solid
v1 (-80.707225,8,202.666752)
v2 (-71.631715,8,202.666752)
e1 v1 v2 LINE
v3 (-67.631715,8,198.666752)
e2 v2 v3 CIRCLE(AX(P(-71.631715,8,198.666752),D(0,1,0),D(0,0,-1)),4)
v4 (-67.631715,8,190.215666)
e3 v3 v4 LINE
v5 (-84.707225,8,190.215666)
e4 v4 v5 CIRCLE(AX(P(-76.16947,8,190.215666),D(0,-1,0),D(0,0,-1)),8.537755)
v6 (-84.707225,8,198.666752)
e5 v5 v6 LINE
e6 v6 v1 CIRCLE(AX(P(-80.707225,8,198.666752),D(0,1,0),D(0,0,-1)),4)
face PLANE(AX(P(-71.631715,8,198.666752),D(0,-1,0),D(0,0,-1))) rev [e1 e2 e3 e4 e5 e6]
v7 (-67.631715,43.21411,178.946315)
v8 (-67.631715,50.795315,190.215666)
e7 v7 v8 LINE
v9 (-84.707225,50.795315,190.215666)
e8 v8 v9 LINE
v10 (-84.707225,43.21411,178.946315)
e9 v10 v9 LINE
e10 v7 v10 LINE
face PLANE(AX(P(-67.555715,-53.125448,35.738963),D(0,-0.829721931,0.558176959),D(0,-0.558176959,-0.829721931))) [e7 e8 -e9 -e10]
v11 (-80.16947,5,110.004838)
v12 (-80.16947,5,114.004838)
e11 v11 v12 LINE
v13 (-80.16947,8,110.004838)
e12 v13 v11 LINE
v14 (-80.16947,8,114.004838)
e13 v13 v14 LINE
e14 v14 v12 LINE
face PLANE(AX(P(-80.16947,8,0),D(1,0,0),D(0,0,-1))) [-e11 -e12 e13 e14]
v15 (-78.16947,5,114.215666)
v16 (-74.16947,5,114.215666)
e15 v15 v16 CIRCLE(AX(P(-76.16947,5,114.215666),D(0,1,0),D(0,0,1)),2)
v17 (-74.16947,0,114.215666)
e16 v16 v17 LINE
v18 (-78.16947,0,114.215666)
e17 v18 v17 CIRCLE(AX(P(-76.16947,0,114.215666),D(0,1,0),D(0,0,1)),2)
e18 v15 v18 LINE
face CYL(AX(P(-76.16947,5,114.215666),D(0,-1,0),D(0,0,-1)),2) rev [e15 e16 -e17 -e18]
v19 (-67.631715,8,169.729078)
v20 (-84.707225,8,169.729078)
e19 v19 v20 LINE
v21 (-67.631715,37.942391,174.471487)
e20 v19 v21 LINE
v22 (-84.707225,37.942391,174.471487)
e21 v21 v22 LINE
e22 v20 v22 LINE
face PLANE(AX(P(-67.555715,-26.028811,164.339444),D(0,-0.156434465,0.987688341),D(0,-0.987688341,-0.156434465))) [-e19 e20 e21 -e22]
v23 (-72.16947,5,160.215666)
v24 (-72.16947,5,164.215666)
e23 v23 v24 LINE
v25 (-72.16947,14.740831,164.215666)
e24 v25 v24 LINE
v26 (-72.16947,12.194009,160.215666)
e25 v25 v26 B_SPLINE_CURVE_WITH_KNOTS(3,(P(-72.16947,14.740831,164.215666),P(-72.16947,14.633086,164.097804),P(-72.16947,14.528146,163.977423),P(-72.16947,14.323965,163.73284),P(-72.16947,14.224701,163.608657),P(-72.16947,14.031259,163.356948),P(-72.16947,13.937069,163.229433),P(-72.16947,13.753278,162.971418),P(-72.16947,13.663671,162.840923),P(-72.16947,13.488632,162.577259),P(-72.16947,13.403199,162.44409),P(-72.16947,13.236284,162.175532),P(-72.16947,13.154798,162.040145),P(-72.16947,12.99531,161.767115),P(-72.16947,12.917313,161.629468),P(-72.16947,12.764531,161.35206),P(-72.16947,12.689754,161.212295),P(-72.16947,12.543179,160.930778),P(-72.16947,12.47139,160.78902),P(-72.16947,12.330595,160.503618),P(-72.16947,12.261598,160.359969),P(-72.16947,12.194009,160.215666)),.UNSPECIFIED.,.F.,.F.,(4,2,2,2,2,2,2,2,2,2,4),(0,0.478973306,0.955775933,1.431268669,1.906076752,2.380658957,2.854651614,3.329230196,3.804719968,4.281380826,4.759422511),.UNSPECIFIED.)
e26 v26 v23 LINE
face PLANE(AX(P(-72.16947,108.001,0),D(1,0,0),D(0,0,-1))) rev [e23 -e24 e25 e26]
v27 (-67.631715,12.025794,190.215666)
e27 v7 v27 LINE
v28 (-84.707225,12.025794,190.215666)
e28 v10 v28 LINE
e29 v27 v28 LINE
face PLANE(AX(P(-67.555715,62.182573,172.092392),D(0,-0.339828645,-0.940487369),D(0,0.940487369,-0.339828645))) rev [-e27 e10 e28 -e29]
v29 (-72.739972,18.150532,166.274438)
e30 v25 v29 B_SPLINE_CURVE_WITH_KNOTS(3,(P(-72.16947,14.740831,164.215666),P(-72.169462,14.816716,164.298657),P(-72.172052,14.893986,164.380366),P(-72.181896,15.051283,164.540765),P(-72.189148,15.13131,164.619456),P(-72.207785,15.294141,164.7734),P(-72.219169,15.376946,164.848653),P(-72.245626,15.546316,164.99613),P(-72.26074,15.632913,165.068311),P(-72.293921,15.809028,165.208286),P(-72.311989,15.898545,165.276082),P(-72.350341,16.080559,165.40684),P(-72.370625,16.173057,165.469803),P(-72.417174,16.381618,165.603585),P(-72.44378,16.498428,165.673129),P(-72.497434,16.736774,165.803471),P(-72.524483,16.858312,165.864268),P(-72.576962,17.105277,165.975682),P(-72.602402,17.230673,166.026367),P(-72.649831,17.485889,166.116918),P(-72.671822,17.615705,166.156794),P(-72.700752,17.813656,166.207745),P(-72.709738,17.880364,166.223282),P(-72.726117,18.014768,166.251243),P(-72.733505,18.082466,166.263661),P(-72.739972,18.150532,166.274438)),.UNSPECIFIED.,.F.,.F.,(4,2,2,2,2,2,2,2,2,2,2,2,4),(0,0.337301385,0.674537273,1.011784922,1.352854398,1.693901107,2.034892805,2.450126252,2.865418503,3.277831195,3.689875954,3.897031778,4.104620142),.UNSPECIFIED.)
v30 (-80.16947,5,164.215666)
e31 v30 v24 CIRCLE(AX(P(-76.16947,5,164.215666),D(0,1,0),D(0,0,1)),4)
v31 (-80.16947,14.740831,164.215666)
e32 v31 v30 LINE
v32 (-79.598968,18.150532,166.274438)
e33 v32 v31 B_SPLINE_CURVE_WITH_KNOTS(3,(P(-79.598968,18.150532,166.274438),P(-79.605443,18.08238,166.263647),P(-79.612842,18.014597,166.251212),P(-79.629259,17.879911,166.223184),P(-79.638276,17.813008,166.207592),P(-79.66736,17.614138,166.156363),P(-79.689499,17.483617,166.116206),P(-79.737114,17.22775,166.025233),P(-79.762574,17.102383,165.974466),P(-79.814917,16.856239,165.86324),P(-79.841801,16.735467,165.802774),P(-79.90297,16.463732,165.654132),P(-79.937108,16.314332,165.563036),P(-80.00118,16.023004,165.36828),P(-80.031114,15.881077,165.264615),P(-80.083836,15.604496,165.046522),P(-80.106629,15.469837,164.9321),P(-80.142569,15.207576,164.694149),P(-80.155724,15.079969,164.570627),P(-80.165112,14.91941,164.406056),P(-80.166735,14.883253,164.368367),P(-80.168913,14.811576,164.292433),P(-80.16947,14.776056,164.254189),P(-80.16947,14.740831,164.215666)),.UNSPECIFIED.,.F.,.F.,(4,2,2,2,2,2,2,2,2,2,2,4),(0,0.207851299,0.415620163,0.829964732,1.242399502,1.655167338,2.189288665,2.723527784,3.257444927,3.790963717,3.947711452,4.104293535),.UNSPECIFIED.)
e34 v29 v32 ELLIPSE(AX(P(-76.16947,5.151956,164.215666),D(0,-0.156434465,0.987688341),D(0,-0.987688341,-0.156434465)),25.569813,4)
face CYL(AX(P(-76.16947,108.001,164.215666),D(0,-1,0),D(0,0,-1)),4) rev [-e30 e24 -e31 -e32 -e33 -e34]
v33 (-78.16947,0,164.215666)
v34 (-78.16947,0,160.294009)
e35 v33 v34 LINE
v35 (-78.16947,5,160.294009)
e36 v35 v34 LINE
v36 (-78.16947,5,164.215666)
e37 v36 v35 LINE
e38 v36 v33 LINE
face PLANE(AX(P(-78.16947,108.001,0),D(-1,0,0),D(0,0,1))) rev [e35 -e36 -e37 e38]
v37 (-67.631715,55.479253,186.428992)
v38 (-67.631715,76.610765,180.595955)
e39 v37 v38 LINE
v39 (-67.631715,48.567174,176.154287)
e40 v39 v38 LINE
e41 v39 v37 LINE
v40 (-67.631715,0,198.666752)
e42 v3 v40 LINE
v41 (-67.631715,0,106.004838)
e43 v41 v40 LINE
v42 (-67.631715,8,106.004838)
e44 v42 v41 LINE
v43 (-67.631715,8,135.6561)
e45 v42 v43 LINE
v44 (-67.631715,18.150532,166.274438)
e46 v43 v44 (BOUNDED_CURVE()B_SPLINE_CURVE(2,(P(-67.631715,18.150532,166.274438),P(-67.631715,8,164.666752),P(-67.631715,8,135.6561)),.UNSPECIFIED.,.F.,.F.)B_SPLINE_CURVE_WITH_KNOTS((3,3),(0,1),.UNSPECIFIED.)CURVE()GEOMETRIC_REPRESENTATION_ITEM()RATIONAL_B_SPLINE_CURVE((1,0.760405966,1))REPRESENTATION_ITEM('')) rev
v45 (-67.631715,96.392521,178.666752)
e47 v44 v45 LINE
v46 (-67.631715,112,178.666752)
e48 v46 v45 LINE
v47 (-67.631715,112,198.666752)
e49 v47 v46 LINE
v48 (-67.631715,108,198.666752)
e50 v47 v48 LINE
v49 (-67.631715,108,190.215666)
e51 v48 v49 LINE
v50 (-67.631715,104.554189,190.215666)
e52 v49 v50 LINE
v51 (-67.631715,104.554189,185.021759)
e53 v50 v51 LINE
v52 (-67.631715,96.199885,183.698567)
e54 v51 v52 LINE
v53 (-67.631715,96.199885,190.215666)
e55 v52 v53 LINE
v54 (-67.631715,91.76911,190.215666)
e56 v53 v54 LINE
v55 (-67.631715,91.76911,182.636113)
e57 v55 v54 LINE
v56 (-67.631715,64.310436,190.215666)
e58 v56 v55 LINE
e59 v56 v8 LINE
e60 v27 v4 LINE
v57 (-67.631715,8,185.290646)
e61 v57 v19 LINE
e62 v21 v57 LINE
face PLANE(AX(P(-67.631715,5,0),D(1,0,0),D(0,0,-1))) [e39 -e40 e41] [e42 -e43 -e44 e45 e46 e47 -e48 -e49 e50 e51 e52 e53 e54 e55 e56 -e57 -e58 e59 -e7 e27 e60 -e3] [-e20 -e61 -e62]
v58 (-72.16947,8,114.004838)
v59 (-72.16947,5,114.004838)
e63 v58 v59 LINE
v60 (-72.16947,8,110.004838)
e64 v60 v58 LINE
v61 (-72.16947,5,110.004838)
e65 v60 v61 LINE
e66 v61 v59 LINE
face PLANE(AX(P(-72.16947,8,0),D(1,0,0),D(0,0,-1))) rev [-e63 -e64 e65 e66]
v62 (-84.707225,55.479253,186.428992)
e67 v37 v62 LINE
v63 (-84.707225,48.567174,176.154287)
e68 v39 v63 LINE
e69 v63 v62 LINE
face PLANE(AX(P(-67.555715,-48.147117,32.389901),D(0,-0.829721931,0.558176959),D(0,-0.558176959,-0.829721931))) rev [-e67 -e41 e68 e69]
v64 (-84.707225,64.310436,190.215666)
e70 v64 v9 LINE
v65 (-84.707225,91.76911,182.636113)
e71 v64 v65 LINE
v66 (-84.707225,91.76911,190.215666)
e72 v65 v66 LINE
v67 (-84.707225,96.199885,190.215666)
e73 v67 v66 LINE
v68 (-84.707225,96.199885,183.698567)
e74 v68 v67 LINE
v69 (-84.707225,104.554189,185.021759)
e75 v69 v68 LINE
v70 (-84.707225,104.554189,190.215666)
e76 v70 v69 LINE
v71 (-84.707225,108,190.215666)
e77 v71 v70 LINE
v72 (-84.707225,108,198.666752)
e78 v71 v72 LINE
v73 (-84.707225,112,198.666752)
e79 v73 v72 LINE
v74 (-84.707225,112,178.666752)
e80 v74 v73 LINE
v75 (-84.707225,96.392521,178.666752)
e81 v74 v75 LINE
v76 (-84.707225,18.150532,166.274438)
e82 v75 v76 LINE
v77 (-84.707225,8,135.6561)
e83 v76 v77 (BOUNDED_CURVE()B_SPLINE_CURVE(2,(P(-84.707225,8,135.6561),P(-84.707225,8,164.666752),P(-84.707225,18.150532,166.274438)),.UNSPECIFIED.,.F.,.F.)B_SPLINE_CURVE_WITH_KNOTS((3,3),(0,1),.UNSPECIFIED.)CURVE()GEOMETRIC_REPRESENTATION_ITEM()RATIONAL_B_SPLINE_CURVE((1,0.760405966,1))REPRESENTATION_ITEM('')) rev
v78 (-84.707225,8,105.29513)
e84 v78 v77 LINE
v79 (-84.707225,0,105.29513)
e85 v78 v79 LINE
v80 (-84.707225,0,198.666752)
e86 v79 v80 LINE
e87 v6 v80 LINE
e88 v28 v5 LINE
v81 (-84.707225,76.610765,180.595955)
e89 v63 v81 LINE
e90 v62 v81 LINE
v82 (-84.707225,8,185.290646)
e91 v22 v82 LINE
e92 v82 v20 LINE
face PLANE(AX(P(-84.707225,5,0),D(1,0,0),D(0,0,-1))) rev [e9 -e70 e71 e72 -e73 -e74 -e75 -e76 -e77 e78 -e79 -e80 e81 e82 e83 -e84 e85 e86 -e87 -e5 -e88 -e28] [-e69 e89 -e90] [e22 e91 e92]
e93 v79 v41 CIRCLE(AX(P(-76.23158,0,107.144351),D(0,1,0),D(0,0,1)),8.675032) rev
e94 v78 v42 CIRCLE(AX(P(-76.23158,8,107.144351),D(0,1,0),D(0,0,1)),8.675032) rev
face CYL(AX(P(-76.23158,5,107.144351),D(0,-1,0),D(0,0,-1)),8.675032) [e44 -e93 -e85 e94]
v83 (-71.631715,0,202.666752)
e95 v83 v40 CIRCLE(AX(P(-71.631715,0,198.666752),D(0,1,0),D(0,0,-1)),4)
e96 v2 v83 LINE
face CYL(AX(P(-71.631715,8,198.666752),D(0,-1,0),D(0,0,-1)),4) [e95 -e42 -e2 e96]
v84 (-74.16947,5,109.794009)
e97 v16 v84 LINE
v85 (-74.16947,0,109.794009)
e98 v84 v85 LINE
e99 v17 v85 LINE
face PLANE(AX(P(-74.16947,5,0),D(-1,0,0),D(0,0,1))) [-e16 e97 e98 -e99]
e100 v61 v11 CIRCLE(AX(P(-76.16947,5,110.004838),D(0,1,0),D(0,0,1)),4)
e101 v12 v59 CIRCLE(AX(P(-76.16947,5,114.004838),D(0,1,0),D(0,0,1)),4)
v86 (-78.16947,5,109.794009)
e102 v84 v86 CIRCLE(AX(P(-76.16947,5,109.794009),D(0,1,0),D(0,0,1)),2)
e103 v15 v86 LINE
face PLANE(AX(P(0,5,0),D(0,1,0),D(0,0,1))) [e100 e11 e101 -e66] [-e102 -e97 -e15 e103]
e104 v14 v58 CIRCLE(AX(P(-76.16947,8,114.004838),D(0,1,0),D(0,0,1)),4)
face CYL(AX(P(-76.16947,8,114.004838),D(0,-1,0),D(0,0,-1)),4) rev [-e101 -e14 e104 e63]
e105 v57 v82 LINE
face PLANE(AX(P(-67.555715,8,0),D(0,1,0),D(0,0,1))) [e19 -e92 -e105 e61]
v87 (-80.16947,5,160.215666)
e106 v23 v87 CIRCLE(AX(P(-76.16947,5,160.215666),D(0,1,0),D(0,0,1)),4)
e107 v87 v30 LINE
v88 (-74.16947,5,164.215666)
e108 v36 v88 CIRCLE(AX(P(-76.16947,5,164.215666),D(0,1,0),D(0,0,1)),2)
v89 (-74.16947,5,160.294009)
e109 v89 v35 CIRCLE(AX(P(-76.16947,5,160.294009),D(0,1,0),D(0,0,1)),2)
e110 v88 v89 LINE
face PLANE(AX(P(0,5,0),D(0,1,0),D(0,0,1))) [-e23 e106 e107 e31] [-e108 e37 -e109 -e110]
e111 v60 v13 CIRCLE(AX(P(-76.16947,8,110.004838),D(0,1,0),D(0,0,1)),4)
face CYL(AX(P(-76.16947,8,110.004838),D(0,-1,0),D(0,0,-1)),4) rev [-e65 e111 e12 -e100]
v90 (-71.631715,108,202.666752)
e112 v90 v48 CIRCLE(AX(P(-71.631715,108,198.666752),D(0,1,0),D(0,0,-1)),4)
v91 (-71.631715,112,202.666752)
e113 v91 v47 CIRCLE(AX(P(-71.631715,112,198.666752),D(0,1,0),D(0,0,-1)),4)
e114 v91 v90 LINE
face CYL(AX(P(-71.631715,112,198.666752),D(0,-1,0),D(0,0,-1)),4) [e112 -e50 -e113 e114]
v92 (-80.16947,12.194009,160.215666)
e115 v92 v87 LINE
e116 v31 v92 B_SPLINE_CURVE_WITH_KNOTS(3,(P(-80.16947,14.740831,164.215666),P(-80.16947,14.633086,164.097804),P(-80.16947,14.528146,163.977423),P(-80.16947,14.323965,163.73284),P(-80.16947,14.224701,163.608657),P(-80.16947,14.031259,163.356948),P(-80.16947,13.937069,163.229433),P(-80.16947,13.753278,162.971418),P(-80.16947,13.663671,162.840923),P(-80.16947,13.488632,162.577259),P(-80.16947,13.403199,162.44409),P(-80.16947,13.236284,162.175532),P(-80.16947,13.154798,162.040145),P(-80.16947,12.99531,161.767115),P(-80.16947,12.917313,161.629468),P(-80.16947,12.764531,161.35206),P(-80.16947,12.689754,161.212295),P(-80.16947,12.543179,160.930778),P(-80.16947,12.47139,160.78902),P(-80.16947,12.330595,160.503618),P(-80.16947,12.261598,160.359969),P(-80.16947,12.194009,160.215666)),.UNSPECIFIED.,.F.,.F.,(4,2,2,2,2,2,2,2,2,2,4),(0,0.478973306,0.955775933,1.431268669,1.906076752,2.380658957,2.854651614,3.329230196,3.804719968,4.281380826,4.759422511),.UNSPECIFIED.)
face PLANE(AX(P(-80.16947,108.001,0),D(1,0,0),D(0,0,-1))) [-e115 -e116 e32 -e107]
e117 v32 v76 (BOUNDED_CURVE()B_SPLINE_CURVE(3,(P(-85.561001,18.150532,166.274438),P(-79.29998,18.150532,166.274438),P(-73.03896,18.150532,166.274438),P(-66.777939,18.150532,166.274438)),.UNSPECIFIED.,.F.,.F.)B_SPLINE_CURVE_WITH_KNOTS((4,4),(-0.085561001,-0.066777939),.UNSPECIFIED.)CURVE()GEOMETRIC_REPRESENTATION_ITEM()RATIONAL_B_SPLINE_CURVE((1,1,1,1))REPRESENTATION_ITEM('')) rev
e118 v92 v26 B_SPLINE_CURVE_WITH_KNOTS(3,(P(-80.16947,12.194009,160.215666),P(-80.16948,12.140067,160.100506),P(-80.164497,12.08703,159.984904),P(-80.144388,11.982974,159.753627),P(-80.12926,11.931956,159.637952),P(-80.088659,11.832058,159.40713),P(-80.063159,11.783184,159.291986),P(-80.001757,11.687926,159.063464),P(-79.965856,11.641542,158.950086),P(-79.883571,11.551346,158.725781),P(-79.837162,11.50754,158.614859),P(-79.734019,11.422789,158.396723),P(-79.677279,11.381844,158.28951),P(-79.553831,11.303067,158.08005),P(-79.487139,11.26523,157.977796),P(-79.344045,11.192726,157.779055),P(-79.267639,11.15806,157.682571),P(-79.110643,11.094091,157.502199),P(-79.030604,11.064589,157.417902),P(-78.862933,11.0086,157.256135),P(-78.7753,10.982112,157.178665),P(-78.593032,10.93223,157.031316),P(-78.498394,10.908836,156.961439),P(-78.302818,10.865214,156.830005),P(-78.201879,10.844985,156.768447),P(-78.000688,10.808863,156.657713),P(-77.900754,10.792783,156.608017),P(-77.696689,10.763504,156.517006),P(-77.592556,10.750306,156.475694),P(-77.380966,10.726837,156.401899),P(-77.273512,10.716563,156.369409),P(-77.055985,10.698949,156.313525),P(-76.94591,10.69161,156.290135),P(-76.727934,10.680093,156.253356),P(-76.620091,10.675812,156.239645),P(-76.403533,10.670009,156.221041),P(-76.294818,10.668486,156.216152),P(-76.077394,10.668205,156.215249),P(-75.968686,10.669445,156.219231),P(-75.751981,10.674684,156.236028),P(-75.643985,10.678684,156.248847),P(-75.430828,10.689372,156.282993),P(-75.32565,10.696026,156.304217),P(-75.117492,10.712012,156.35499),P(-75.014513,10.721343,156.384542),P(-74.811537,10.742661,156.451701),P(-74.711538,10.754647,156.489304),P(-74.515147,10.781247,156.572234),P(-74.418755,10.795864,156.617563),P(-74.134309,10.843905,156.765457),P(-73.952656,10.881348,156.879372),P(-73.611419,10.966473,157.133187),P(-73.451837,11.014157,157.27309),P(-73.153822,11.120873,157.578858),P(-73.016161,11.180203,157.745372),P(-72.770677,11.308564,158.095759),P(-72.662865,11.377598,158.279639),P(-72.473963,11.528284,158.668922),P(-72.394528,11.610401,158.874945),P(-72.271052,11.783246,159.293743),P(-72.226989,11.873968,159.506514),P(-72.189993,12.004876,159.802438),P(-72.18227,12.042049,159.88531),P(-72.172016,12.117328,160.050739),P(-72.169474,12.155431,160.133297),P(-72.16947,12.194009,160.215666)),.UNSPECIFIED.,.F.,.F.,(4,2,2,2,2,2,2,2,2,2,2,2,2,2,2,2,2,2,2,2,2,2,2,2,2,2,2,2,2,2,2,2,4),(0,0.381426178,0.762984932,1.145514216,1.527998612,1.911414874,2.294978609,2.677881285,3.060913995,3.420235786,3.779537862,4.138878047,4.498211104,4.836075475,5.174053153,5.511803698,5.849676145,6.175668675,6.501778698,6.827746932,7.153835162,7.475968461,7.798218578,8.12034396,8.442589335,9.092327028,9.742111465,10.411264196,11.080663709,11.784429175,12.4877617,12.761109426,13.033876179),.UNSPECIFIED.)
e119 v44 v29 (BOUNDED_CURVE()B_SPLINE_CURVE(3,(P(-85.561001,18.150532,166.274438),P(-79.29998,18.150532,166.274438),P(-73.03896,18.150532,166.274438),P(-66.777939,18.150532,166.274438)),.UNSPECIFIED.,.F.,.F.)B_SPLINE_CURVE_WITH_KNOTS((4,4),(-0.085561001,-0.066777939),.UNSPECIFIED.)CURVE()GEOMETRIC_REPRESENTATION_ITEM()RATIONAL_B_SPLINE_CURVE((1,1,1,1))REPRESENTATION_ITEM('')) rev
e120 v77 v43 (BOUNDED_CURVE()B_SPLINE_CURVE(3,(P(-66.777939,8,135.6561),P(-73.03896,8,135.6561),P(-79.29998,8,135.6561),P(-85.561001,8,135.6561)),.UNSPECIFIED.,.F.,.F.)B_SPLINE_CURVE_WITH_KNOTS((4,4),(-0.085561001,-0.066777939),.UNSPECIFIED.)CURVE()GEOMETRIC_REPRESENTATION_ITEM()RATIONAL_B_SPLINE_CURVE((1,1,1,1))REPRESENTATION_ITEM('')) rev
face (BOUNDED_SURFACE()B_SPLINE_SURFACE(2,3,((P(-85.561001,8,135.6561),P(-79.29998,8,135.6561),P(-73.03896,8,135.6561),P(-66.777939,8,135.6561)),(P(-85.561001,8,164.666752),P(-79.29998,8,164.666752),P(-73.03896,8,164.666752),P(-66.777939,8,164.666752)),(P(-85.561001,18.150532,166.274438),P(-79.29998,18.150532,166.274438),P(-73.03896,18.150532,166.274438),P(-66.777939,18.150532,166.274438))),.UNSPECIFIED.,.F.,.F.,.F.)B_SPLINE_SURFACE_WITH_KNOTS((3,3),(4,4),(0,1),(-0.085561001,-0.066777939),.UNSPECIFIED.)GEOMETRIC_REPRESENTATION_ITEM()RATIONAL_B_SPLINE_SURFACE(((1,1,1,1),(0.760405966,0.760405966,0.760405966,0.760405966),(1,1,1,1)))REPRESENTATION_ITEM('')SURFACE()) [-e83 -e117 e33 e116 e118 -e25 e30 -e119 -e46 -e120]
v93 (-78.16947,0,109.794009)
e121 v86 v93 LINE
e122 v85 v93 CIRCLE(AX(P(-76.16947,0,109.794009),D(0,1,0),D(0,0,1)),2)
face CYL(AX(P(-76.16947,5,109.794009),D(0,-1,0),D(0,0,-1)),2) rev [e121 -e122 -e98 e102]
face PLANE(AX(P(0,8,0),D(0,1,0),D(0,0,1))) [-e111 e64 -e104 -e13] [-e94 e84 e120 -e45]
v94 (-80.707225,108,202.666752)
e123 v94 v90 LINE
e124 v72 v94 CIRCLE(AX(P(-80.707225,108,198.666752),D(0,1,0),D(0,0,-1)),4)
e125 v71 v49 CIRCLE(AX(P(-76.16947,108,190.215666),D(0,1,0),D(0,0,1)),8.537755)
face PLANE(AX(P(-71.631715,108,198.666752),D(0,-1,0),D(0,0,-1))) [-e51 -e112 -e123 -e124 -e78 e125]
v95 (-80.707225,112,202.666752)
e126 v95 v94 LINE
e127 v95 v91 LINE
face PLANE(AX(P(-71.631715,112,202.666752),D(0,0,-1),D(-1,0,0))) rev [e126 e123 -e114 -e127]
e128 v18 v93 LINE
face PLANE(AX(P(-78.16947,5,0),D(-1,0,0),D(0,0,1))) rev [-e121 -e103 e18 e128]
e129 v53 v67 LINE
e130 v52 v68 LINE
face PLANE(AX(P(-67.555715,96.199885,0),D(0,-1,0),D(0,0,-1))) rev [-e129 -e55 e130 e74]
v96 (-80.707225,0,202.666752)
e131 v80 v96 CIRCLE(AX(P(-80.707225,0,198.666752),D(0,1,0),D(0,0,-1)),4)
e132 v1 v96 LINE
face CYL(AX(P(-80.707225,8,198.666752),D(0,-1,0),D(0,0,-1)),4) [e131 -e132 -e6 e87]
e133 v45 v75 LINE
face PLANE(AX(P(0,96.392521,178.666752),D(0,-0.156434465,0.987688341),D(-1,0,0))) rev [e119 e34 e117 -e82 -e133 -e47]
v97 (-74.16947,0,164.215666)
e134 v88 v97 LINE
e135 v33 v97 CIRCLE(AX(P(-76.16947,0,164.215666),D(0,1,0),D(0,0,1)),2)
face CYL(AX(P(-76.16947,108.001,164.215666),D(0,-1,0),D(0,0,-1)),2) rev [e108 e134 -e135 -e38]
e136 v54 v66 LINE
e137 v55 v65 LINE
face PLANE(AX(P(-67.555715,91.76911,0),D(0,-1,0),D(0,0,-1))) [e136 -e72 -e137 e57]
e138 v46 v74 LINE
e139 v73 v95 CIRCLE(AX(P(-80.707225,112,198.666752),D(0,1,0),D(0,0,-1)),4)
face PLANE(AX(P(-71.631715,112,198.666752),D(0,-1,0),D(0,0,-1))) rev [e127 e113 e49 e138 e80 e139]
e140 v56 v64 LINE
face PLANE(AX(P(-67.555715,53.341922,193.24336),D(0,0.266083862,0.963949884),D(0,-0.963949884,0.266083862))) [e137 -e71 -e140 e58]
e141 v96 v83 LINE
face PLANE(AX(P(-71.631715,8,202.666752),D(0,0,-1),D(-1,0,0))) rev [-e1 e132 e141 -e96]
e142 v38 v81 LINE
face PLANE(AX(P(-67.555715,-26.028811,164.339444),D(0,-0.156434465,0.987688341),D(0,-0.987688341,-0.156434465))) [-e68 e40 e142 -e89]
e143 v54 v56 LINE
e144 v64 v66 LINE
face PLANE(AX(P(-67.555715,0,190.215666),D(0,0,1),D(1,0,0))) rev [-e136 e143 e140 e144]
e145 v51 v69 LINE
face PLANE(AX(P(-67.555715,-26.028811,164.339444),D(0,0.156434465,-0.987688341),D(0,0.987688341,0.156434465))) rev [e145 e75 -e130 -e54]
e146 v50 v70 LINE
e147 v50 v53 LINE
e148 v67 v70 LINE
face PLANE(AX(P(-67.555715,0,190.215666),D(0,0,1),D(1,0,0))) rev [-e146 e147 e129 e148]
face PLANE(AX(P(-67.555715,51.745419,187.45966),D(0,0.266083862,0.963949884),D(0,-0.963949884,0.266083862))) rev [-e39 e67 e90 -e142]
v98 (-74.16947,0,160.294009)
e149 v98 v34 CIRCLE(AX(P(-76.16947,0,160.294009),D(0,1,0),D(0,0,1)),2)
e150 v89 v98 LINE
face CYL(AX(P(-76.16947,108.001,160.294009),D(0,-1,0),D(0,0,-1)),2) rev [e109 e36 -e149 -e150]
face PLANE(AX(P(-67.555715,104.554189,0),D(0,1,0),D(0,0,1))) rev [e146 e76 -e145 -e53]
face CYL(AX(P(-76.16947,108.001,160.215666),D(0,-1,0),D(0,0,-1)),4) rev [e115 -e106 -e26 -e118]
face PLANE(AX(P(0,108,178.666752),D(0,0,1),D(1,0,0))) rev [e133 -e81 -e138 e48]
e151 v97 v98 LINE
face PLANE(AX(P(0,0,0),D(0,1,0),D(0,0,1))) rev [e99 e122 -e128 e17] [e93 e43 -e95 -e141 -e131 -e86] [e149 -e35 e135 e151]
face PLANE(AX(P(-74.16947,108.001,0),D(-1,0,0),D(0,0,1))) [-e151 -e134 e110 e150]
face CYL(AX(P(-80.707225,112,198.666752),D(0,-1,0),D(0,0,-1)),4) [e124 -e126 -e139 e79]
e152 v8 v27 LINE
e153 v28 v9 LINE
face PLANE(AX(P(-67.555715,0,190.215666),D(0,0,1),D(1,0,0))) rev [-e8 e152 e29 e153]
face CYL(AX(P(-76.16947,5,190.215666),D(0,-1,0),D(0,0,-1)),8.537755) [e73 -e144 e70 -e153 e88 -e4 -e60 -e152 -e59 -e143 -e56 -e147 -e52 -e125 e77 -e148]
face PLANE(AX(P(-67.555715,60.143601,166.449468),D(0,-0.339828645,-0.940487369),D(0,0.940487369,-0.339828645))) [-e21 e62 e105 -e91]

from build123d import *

# Parameters (mm, degrees)
BOSS_EXTRUDE1_DEPTH = 5
BOSS_EXTRUDE2_START = 5
BOSS_EXTRUDE2_DEPTH = 3
BOSS_EXTRUDE3_START = 8
BOSS_EXTRUDE3_DEPTH = 100
CHAMFER1_SIZE       = 14
CHAMFER1_SIZE2      = 88.392521205
CUT_EXTRUDE1_REACH  = 228.845
CUT_EXTRUDE2_REACH  = 243.541
CUT_EXTRUDE3_START  = 5
CUT_EXTRUDE3_DEPTH  = 25.406962
BOSS_EXTRUDE4_DEPTH = 4
BOSS_EXTRUDE5_START = -108
BOSS_EXTRUDE5_DEPTH = 8


with BuildPart() as part:
    # Sketch1 → Boss-Extrude1 (new body)
    # profile 1 of 5: a face of its own
    with BuildSketch(Plane(origin=(0, 0, 0), x_dir=(1, 0, 0), z_dir=(0, 1, 0))):
        with BuildLine():
            Line((-67.63171498, -190.215666308), (-67.63171498, -178.666752182))
            Line((-67.63171498, -178.666752182), (-84.707225068, -178.666752182))
            Line((-84.707225068, -178.666752182), (-84.707225068, -190.215666308))
            ThreePointArc((-84.707225068, -190.215666308), (-76.169470024, -198.753421352), (-67.63171498, -190.215666308))
        make_face()
    # profile 2 of 5: a face of its own
    with BuildSketch(Plane(origin=(0, 0, 0), x_dir=(1, 0, 0), z_dir=(0, 1, 0))):
        with BuildLine():
            Line((-84.707225068, -178.666752182), (-67.63171498, -178.666752182))
            Line((-67.63171498, -178.666752182), (-67.63171498, -106.004837653))
            ThreePointArc((-67.63171498, -106.004837653), (-75.871331662, -98.476802493), (-84.707225068, -105.29512957))
            Line((-84.707225068, -105.29512957), (-84.707225068, -178.666752182))
        make_face()
        with BuildLine():
            ThreePointArc((-80.169470024, -160.215666308), (-76.169470024, -156.215666308), (-72.169470024, -160.215666308))
            Line((-72.169470024, -160.215666308), (-72.169470024, -164.215666308))
            ThreePointArc((-72.169470024, -164.215666308), (-76.169470024, -168.215666308), (-80.169470024, -164.215666308))
            Line((-80.169470024, -164.215666308), (-80.169470024, -160.215666308))
        make_face(mode=Mode.SUBTRACT)
        with BuildLine():
            ThreePointArc((-80.169470024, -110.004837653), (-76.169470024, -106.004837653), (-72.169470024, -110.004837653))
            Line((-72.169470024, -110.004837653), (-72.169470024, -114.004837653))
            ThreePointArc((-72.169470024, -114.004837653), (-76.169470024, -118.004837653), (-80.169470024, -114.004837653))
            Line((-80.169470024, -114.004837653), (-80.169470024, -110.004837653))
        make_face(mode=Mode.SUBTRACT)
    # profile 3 of 5: a face of its own
    with BuildSketch(Plane(origin=(0, 0, 0), x_dir=(1, 0, 0), z_dir=(0, 1, 0))):
        with BuildLine():
            Line((-80.169470024, -160.215666308), (-80.169470024, -164.215666308))
            ThreePointArc((-80.169470024, -164.215666308), (-76.169470024, -168.215666308), (-72.169470024, -164.215666308))
            Line((-72.169470024, -164.215666308), (-72.169470024, -160.215666308))
            ThreePointArc((-72.169470024, -160.215666308), (-76.169470024, -156.215666308), (-80.169470024, -160.215666308))
        make_face()
        with BuildLine():
            ThreePointArc((-74.169470024, -160.294008998), (-76.169470024, -158.294008998), (-78.169470024, -160.294008998))
            Line((-78.169470024, -160.294008998), (-78.169470024, -164.215666308))
            ThreePointArc((-78.169470024, -164.215666308), (-76.169470024, -166.215666308), (-74.169470024, -164.215666308))
            Line((-74.169470024, -164.215666308), (-74.169470024, -160.294008998))
        make_face(mode=Mode.SUBTRACT)
    # profile 4 of 5: a face of its own
    with BuildSketch(Plane(origin=(0, 0, 0), x_dir=(1, 0, 0), z_dir=(0, 1, 0))):
        with BuildLine():
            Line((-80.169470024, -110.004837653), (-80.169470024, -114.004837653))
            ThreePointArc((-80.169470024, -114.004837653), (-76.169470024, -118.004837653), (-72.169470024, -114.004837653))
            Line((-72.169470024, -114.004837653), (-72.169470024, -110.004837653))
            ThreePointArc((-72.169470024, -110.004837653), (-76.169470024, -106.004837653), (-80.169470024, -110.004837653))
        make_face()
        with BuildLine():
            ThreePointArc((-74.169470024, -109.794008998), (-76.169470024, -107.794008998), (-78.169470024, -109.794008998))
            Line((-78.169470024, -109.794008998), (-78.169470024, -114.215666308))
            ThreePointArc((-78.169470024, -114.215666308), (-76.169470024, -116.215666308), (-74.169470024, -114.215666308))
            Line((-74.169470024, -114.215666308), (-74.169470024, -109.794008998))
        make_face(mode=Mode.SUBTRACT)
    # profile 5 of 5: a face of its own
    with BuildSketch(Plane(origin=(0, 0, 0), x_dir=(1, 0, 0), z_dir=(0, 1, 0))):
        with BuildLine():
            Line((-74.169470024, -164.215666308), (-74.169470024, -160.294008998))
            ThreePointArc((-74.169470024, -160.294008998), (-76.169470024, -158.294008998), (-78.169470024, -160.294008998))
            Line((-78.169470024, -160.294008998), (-78.169470024, -164.215666308))
            ThreePointArc((-78.169470024, -164.215666308), (-76.169470024, -166.215666308), (-74.169470024, -164.215666308))
        make_face()
    extrude(amount=BOSS_EXTRUDE1_DEPTH)

    # Sketch1<3> → Boss-Extrude2 (add)
    with BuildSketch(Plane(origin=(0, 0, 0), x_dir=(1, 0, 0), z_dir=(0, 1, 0)).offset(BOSS_EXTRUDE2_START)):
        with BuildLine():
            Line((-67.63171498, -190.215666308), (-67.63171498, -106.004837653))
            ThreePointArc((-67.63171498, -106.004837653), (-75.871331662, -98.476802493), (-84.707225068, -105.29512957))
            Line((-84.707225068, -105.29512957), (-84.707225068, -190.215666308))
            ThreePointArc((-84.707225068, -190.215666308), (-76.169470024, -198.753421352), (-67.63171498, -190.215666308))
        make_face()
        with BuildLine():
            Line((-72.169470024, -110.004837653), (-72.169470024, -114.004837653))
            ThreePointArc((-72.169470024, -114.004837653), (-76.169470024, -118.004837653), (-80.169470024, -114.004837653))
            Line((-80.169470024, -114.004837653), (-80.169470024, -110.004837653))
            ThreePointArc((-80.169470024, -110.004837653), (-76.169470024, -106.004837653), (-72.169470024, -110.004837653))
        make_face(mode=Mode.SUBTRACT)
    extrude(amount=BOSS_EXTRUDE2_DEPTH)

    # Sketch1<4> → Boss-Extrude3 (add)
    with BuildSketch(Plane(origin=(0, 0, 0), x_dir=(1, 0, 0), z_dir=(0, 1, 0)).offset(BOSS_EXTRUDE3_START)):
        with BuildLine():
            Line((-67.63171498, -190.215666308), (-67.63171498, -178.666752182))
            Line((-67.63171498, -178.666752182), (-84.707225068, -178.666752182))
            Line((-84.707225068, -178.666752182), (-84.707225068, -190.215666308))
            ThreePointArc((-84.707225068, -190.215666308), (-76.169470024, -198.753421352), (-67.63171498, -190.215666308))
        make_face()
    extrude(amount=BOSS_EXTRUDE3_DEPTH)

    # Chamfer1
    chamfer1_edges = [part.edges().sort_by_distance(p)[0] for p in [
        (-76.169470024, 8, 178.666752182),
    ]]
    chamfer1_side = [part.faces().sort_by_distance(p)[0] for p in [
        (-76.174011802, 8, 141.227226291),
    ]]
    chamfer(chamfer1_edges, length=CHAMFER1_SIZE, length2=CHAMFER1_SIZE2, reference=chamfer1_side[0])

    # Fillet1
    # an asymmetric fillet: 31, 15 mm, written as the material it adds along each edge
    with BuildSketch(Plane(origin=(-67.63171498, 8, 164.666752182), x_dir=(0, 0.9876883405951381, 0.15643446504022812), z_dir=(-1, 0, 0))) as fillet1_piece_1:
        with BuildLine():
            Bezier((10.277059237, 0), (0, 0), (-4.538265872, 28.653483024), weights=[1, 0.760405966, 1])
            Line((-4.538265872, 28.653483024), (0, 0))
            Line((0, 0), (10.277059237, 0))
        make_face()
    extrude(amount=17.075510088)

    # Sketch2 → Cut-Extrude1 (cut, up to next)
    with BuildSketch(Plane.ZY.offset(84.707225068), mode=Mode.PRIVATE) as cut_extrude1_sk1:
        Polygon((190.215666308, 91.769109668), (182.636112577, 91.769109668), (190.215666308, 64.31043598), align=None)
    cut_extrude1_tool1 = extrude(cut_extrude1_sk1.sketch, amount=-CUT_EXTRUDE1_REACH, mode=Mode.PRIVATE) & part.part
    # Sketch2 → Cut-Extrude1 (cut, up to next)
    with BuildSketch(Plane.ZY.offset(84.707225068), mode=Mode.PRIVATE) as cut_extrude1_sk2:
        Polygon((176.154286922, 48.567173756), (180.595955478, 76.61076533), (186.42899162, 55.479252617), align=None)
    cut_extrude1_tool2 = extrude(cut_extrude1_sk2.sketch, amount=-CUT_EXTRUDE1_REACH, mode=Mode.PRIVATE) & part.part
    # Sketch2 → Cut-Extrude1 (cut, up to next)
    with BuildSketch(Plane.ZY.offset(84.707225068), mode=Mode.PRIVATE) as cut_extrude1_sk3:
        Polygon((190.215666308, 12.025794409), (190.215666308, 50.795315392), (178.946314561, 43.21410987), align=None)
    cut_extrude1_tool3 = extrude(cut_extrude1_sk3.sketch, amount=-CUT_EXTRUDE1_REACH, mode=Mode.PRIVATE) & part.part
    # Sketch2 → Cut-Extrude1 (cut, up to next)
    with BuildSketch(Plane.ZY.offset(84.707225068), mode=Mode.PRIVATE) as cut_extrude1_sk4:
        Polygon((174.47148672, 37.942391428), (185.290645631, 8), (169.729077811, 8), align=None)
    cut_extrude1_tool4 = extrude(cut_extrude1_sk4.sketch, amount=-CUT_EXTRUDE1_REACH, mode=Mode.PRIVATE) & part.part
    # Sketch2 → Cut-Extrude1 (cut, up to next)
    with BuildSketch(Plane.ZY.offset(84.707225068), mode=Mode.PRIVATE) as cut_extrude1_sk5:
        Polygon((185.02175896, 104.554188767), (183.698567215, 96.199884882), (190.215666308, 96.199884882), (190.215666308, 104.554188767), align=None)
    cut_extrude1_tool5 = extrude(cut_extrude1_sk5.sketch, amount=-CUT_EXTRUDE1_REACH, mode=Mode.PRIVATE) & part.part
    add(cut_extrude1_tool1.solids().sort_by_distance((-84.707225, 82.616218, 187.689148))[0], mode=Mode.SUBTRACT)
    add(cut_extrude1_tool2.solids().sort_by_distance((-84.707225, 60.219064, 181.059745))[0], mode=Mode.SUBTRACT)
    add(cut_extrude1_tool3.solids().sort_by_distance((-84.707225, 35.345073, 186.459216))[0], mode=Mode.SUBTRACT)
    add(cut_extrude1_tool4.solids().sort_by_distance((-84.707225, 17.980797, 176.49707))[0], mode=Mode.SUBTRACT)
    add(cut_extrude1_tool5.solids().sort_by_distance((-84.707225, 100.219716, 187.275456))[0], mode=Mode.SUBTRACT)

    # Sketch1<5> → Cut-Extrude2 (cut, up to next)
    with BuildSketch(Plane(origin=(0, 0, 0), x_dir=(1, 0, 0), z_dir=(0, 1, 0)), mode=Mode.PRIVATE) as cut_extrude2_sk1:
        with BuildLine():
            Line((-74.169470024, -164.215666308), (-74.169470024, -160.294008998))
            ThreePointArc((-74.169470024, -160.294008998), (-76.169470024, -158.294008998), (-78.169470024, -160.294008998))
            Line((-78.169470024, -160.294008998), (-78.169470024, -164.215666308))
            ThreePointArc((-78.169470024, -164.215666308), (-76.169470024, -166.215666308), (-74.169470024, -164.215666308))
        make_face()
    cut_extrude2_tool1 = extrude(cut_extrude2_sk1.sketch, amount=CUT_EXTRUDE2_REACH, mode=Mode.PRIVATE) & part.part
    add(cut_extrude2_tool1.solids().sort_by_distance((-76.16947, 0, 162.254838))[0], mode=Mode.SUBTRACT)

    # Sketch1<6> → Cut-Extrude3 (cut)
    with BuildSketch(Plane(origin=(0, 0, 0), x_dir=(1, 0, 0), z_dir=(0, 1, 0)).offset(CUT_EXTRUDE3_START)):
        with BuildLine():
            Line((-80.169470024, -160.215666308), (-80.169470024, -164.215666308))
            ThreePointArc((-80.169470024, -164.215666308), (-76.169470024, -168.215666308), (-72.169470024, -164.215666308))
            Line((-72.169470024, -164.215666308), (-72.169470024, -160.215666308))
            ThreePointArc((-72.169470024, -160.215666308), (-76.169470024, -156.215666308), (-80.169470024, -160.215666308))
        make_face()
        with BuildLine():
            ThreePointArc((-74.169470024, -160.294008998), (-76.169470024, -158.294008998), (-78.169470024, -160.294008998))
            Line((-78.169470024, -160.294008998), (-78.169470024, -164.215666308))
            ThreePointArc((-78.169470024, -164.215666308), (-76.169470024, -166.215666308), (-74.169470024, -164.215666308))
            Line((-74.169470024, -164.215666308), (-74.169470024, -160.294008998))
        make_face(mode=Mode.SUBTRACT)
    extrude(amount=CUT_EXTRUDE3_DEPTH, mode=Mode.SUBTRACT)

    # Sketch4 → Boss-Extrude4 (add)
    with BuildSketch(Plane(origin=(0, 108, 0), x_dir=(1, 0, 0), z_dir=(0, 1, 0))):
        with BuildLine():
            Line((-67.63171498, -178.666752182), (-67.63171498, -198.666752182))
            ThreePointArc((-67.63171498, -198.666752182), (-68.803287856, -201.495179307), (-71.63171498, -202.666752182))
            Line((-71.63171498, -202.666752182), (-80.707225068, -202.666752182))
            ThreePointArc((-80.707225068, -202.666752182), (-83.535652193, -201.495179307), (-84.707225068, -198.666752182))
            Line((-84.707225068, -198.666752182), (-84.707225068, -178.666752182))
            Line((-84.707225068, -178.666752182), (-67.63171498, -178.666752182))
        make_face()
    extrude(amount=BOSS_EXTRUDE4_DEPTH)

    # Sketch4<2> → Boss-Extrude5 (add)
    with BuildSketch(Plane(origin=(0, 108, 0), x_dir=(1, 0, 0), z_dir=(0, 1, 0)).offset(BOSS_EXTRUDE5_START)):
        with BuildLine():
            Line((-67.63171498, -178.666752182), (-67.63171498, -198.666752182))
            ThreePointArc((-67.63171498, -198.666752182), (-68.803287856, -201.495179307), (-71.63171498, -202.666752182))
            Line((-71.63171498, -202.666752182), (-80.707225068, -202.666752182))
            ThreePointArc((-80.707225068, -202.666752182), (-83.535652193, -201.495179307), (-84.707225068, -198.666752182))
            Line((-84.707225068, -198.666752182), (-84.707225068, -178.666752182))
            Line((-84.707225068, -178.666752182), (-67.63171498, -178.666752182))
        make_face()
    extrude(amount=BOSS_EXTRUDE5_DEPTH)


solid = part.part
